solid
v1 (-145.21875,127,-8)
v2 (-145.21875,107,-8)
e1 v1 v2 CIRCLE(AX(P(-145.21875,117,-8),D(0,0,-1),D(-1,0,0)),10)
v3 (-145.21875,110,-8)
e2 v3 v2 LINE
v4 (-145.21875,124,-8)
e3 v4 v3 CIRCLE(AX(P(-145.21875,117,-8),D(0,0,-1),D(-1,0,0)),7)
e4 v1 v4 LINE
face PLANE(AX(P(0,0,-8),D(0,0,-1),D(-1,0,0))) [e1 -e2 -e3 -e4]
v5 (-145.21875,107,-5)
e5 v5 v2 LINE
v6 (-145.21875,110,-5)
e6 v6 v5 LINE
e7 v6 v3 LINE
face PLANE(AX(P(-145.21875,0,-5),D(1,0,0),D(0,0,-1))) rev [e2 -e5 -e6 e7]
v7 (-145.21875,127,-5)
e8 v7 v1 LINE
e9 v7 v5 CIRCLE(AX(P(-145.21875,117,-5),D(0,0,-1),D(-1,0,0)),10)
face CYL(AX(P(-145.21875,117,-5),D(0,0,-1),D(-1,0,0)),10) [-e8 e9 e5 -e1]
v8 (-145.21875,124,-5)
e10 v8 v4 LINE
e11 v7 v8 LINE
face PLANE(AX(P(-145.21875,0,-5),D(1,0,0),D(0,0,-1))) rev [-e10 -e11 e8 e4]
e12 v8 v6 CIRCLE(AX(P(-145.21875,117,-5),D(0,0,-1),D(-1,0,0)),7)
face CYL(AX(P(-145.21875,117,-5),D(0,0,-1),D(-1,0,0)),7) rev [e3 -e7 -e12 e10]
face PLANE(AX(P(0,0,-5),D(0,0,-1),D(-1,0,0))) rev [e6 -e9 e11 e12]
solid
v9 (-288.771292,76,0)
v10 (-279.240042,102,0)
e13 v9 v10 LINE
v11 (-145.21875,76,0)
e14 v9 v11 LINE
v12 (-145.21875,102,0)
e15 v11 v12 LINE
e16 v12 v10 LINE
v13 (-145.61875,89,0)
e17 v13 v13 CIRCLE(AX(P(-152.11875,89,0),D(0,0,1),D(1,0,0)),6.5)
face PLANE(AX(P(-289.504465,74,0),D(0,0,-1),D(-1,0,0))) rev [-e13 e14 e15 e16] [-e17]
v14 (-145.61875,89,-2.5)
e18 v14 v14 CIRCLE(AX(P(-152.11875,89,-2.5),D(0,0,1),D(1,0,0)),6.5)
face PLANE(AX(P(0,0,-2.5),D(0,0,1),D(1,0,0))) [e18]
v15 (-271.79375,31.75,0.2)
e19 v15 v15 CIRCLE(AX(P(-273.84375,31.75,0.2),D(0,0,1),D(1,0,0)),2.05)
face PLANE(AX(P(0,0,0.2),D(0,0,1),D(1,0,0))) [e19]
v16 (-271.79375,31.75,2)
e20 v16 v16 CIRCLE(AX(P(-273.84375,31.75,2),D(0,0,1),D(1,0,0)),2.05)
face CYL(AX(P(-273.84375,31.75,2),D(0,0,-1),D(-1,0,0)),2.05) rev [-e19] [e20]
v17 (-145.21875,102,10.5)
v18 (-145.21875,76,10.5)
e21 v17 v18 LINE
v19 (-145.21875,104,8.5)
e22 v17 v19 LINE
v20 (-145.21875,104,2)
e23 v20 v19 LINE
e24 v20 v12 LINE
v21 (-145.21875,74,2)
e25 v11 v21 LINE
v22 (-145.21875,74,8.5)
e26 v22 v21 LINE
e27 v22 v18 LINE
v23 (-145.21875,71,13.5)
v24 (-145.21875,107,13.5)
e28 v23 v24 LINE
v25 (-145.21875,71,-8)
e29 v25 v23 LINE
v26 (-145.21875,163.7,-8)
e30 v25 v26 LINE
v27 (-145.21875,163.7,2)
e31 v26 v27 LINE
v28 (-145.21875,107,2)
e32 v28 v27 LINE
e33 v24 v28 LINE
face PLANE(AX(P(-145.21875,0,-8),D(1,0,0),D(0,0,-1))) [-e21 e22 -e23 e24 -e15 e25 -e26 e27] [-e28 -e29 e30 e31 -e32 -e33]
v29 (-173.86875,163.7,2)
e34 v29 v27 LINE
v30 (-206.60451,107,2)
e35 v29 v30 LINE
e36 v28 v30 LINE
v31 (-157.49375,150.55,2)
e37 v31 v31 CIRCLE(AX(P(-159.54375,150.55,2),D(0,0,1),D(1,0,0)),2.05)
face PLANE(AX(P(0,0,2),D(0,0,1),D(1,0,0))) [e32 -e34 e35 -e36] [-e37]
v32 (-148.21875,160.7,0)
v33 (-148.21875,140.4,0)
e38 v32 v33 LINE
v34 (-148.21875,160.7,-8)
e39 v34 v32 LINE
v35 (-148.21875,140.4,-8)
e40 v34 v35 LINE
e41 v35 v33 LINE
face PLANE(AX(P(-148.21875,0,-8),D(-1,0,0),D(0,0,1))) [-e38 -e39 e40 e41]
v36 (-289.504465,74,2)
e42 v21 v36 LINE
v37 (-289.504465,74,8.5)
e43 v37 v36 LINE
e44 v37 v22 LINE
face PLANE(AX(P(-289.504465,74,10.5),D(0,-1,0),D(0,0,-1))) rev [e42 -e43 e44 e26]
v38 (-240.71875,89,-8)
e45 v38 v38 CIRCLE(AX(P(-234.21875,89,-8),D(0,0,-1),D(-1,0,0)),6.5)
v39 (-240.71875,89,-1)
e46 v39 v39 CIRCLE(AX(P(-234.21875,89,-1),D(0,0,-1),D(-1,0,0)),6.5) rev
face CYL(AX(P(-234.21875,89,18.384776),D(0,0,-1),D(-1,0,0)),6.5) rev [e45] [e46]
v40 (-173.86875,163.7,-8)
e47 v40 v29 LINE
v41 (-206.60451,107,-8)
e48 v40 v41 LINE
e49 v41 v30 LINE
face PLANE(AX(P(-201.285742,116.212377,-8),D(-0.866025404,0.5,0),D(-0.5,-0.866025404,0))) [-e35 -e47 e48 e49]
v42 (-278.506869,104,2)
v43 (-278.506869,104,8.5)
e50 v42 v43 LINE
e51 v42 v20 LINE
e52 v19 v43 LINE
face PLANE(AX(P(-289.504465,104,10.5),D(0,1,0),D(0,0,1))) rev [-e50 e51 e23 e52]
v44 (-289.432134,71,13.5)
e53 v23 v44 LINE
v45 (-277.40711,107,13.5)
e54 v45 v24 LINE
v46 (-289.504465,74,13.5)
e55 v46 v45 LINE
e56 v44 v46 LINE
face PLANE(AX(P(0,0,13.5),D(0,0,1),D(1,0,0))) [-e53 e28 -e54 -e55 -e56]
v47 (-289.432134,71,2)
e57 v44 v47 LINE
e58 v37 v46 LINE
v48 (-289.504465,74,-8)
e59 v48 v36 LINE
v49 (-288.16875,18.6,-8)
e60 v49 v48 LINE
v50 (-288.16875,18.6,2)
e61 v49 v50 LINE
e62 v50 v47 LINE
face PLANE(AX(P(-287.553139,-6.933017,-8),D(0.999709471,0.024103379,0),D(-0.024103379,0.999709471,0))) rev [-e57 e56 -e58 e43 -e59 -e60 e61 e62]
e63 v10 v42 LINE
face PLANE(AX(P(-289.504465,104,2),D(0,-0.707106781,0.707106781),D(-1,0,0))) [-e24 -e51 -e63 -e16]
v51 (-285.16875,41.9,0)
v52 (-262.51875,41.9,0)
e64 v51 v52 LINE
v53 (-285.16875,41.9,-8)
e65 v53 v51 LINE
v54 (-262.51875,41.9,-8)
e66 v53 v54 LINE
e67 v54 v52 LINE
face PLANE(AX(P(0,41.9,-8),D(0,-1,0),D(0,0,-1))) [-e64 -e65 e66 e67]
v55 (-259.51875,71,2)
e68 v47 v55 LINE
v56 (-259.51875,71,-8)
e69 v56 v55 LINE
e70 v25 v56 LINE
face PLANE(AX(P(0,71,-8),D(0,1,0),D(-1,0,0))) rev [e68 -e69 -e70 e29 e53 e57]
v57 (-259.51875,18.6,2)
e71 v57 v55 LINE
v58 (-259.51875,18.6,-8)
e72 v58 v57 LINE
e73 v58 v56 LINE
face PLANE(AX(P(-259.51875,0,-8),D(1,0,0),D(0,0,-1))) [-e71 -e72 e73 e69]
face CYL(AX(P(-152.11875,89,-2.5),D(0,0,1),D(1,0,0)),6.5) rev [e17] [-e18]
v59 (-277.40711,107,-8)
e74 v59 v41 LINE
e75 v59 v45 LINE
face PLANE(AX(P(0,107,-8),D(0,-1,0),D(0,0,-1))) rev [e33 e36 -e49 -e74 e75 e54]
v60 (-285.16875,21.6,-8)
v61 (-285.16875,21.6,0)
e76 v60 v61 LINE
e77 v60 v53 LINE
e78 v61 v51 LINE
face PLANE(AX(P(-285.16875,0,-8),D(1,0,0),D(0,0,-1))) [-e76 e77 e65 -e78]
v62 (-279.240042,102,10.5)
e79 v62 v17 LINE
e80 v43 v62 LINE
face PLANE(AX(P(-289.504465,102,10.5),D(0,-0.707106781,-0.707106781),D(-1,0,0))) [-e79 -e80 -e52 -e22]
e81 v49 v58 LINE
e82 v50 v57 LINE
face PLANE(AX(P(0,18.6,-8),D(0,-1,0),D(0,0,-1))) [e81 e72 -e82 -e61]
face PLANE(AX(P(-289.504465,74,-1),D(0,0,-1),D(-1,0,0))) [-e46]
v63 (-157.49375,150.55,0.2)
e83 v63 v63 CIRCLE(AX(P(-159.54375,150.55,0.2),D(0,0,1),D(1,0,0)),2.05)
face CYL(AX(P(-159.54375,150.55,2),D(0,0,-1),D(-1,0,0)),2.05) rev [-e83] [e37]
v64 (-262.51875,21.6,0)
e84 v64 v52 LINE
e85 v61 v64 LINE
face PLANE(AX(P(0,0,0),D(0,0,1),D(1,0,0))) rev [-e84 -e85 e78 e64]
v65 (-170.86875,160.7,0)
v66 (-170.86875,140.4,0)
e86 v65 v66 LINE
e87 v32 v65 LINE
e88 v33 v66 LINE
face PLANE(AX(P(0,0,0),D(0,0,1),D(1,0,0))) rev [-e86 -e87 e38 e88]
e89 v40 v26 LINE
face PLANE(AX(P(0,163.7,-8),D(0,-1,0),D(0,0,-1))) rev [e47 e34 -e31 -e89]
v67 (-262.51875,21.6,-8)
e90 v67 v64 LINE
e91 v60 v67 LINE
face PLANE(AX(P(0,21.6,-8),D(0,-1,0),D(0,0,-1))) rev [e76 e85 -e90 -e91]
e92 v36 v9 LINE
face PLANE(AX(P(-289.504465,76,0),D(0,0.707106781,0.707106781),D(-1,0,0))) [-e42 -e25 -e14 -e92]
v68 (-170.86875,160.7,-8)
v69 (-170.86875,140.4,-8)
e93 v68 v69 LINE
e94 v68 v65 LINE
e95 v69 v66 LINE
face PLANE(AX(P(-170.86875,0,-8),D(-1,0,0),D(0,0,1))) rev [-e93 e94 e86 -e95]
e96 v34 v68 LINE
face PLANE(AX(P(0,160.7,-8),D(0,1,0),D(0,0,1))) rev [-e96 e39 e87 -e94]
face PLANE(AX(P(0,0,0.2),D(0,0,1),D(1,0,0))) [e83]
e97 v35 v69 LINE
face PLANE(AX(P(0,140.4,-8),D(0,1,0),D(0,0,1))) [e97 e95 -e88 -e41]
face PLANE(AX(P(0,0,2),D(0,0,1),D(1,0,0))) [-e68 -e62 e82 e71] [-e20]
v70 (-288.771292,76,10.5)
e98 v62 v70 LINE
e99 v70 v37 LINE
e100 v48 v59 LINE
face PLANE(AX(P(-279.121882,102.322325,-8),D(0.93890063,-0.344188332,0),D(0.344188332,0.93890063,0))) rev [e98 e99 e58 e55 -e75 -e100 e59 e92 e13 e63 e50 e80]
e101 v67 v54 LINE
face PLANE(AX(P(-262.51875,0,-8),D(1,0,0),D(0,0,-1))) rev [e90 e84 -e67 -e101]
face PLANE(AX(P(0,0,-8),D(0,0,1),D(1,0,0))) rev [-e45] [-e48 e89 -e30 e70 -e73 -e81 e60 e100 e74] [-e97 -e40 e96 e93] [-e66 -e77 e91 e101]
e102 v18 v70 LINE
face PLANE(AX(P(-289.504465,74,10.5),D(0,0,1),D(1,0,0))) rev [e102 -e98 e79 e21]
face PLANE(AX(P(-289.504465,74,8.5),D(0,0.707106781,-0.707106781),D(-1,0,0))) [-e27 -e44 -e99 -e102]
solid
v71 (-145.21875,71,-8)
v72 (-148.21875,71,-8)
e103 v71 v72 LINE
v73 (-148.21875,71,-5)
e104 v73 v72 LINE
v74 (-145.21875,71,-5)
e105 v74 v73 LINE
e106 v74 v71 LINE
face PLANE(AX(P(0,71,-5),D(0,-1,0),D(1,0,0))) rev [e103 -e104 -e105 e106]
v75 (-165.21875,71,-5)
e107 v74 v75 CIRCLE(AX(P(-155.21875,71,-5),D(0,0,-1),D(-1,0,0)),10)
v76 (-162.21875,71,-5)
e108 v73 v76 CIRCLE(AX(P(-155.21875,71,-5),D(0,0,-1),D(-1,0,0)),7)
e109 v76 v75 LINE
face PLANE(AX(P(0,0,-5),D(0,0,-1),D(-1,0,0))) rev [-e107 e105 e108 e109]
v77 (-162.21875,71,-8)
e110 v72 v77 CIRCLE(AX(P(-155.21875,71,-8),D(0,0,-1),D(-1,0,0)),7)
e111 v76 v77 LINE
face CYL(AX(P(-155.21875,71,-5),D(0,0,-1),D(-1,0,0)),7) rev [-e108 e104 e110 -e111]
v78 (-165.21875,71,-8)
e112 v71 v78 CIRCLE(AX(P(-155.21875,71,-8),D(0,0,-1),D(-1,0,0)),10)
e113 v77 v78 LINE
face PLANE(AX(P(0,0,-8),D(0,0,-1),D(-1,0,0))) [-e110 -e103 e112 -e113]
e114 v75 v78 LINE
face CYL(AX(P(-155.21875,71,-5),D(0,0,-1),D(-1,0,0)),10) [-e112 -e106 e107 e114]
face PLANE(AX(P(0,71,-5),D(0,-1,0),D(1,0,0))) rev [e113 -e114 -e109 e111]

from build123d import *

# Parameters (mm, degrees)
SKETCH3_W             = 22.65000000000009
SKETCH3_H             = 20.30000000000004
SKETCH3_W_2           = 22.64999999999995
BOSS_EXTRUDE1_DEPTH   = 8
SKETCH3_4_R           = 2.049999999999966
SKETCH3_4_R_2         = 2.0499999999999923
BOSS_EXTRUDE2_DEPTH   = 2
BOSS_EXTRUDE3_DEPTH   = 13.5
SKETCH4_W             = 10.499999999999998
SKETCH4_H             = 30.000000000000014
CUT_EXTRUDE1_DEPTH    = 219.62824070668816
CHAMFER1_SIZE         = 2
SKETCH7_R             = 6.500000000000016
CUT_EXTRUDE3_DEPTH    = 2.5
SKETCH8_R             = 6.500000000000016
CUT_EXTRUDE4_DEPTH    = 7
BOSS_EXTRUDE4_DEPTH   = 3
BOSS_EXTRUDE4_2_DEPTH = 3
SKETCH3_9_R           = 2.0499999999999923
SKETCH3_9_R_2         = 2.049999999999966
BOSS_EXTRUDE5_DEPTH   = 0.2


with BuildPart() as part:
    # Sketch3 → Boss-Extrude1 (new body)
    with BuildSketch(Plane.XY):
        Polygon((-289.50446528221903, 74), (-288.1687500000001, 18.600000000000023), (-259.51875, 18.600000000000023), (-259.51875, 71), (-145.21875, 71), (-145.21875, 163.70000000000002), (-173.86874999999995, 163.70000000000002), (-206.60451026305154, 107), (-277.4071095129883, 106.99999999999999), align=None)
        with Locations((-273.84375000000006, 31.750000000000043)):
            Rectangle(SKETCH3_W, SKETCH3_H, mode=Mode.SUBTRACT)
        with Locations((-159.54375, 150.55)):
            Rectangle(SKETCH3_W_2, SKETCH3_H, mode=Mode.SUBTRACT)
    extrude(amount=-BOSS_EXTRUDE1_DEPTH)



with BuildPart() as body_2:
    # Sketch3<4> → Boss-Extrude2 (new body)
    with BuildSketch(Plane.XY):
        Polygon((-289.50446528221903, 74), (-288.1687500000001, 18.600000000000023), (-259.51875, 18.600000000000023), (-259.51875, 71), (-145.21875, 71), (-145.21875, 163.70000000000002), (-173.86874999999995, 163.70000000000002), (-206.60451026305154, 107), (-277.4071095129883, 106.99999999999999), align=None)
        with Locations((-273.84375, 31.749999999999986)):
            Circle(SKETCH3_4_R, mode=Mode.SUBTRACT)
        with Locations((-159.54375, 150.55)):
            Circle(SKETCH3_4_R_2, mode=Mode.SUBTRACT)
    extrude(amount=BOSS_EXTRUDE2_DEPTH)


with BuildPart() as part_1:
    add(part.part)

    add(body_2.part)  # Boss-Extrude3 merges body 2
    # Sketch3<8> → Boss-Extrude3 (add)
    with BuildSketch(Plane.XY):
        Polygon((-288.1687500000001, 77.64365611411853), (-288.1687500000001, 70.99999999999999), (-259.51875, 71), (-145.21875, 71), (-145.21875, 107), (-206.60451026305154, 107), (-277.4071095129883, 106.99999999999999), align=None)
        Polygon((-289.4321341297523, 70.99999999999999), (-288.1687500000001, 70.99999999999999), (-288.1687500000001, 77.64365611411853), (-289.50446528221903, 74), align=None)
    extrude(amount=BOSS_EXTRUDE3_DEPTH)

    # Sketch4 → Cut-Extrude1 (cut, through all)
    with BuildSketch(Plane(origin=(-145.21875, 0, 0), x_dir=(0, 0, -1), z_dir=(1, 0, 0))):
        with Locations((-5.249999999999999, 89)):
            Rectangle(SKETCH4_W, SKETCH4_H)
    extrude(amount=-CUT_EXTRUDE1_DEPTH, mode=Mode.SUBTRACT)

    # Chamfer1
    chamfer1_edges = [part_1.edges().sort_by_distance(p)[0] for p in [
        (-217.36160764110952, 74, 10.499999999999998),
        (-211.86280956418642, 104, 10.499999999999998),
        (-211.86280956418642, 104, 0),
        (-217.36160764110952, 74, 0),
    ]]
    chamfer(chamfer1_edges, length=CHAMFER1_SIZE)

    # Sketch7 → Cut-Extrude3 (cut)
    with BuildSketch(Plane.XY):
        with Locations((-152.11875000000003, 88.99999999999999)):
            Circle(SKETCH7_R)
    extrude(amount=-CUT_EXTRUDE3_DEPTH, mode=Mode.SUBTRACT)

    # Sketch8 → Cut-Extrude4 (cut)
    with BuildSketch(Plane(origin=(0, 0, -8), x_dir=(-1, 0, 0), z_dir=(0, 0, -1))):
        with Locations((234.21875, 89)):
            Circle(SKETCH8_R)
    extrude(amount=-CUT_EXTRUDE4_DEPTH, mode=Mode.SUBTRACT)

    # Sketch3<9> → Boss-Extrude5 (add)
    with BuildSketch(Plane.XY):
        with Locations((-159.54375, 150.55)):
            Circle(SKETCH3_9_R)
        with Locations((-273.84375, 31.749999999999986)):
            Circle(SKETCH3_9_R_2)
    extrude(amount=BOSS_EXTRUDE5_DEPTH)


with BuildPart() as body_2_2:
    # Sketch9 → Boss-Extrude4 (new body)
    with BuildSketch(Plane(origin=(0, 0, -8), x_dir=(-1, 0, 0), z_dir=(0, 0, -1))):
        with BuildLine():
            ThreePointArc((145.21875000000003, 71), (155.21875000000003, 60.999999999999986), (165.21875000000003, 71))
            Line((165.21875000000003, 71), (162.21875000000003, 71))
            ThreePointArc((162.21875000000006, 71), (155.21875000000003, 63.999999999999986), (148.21875, 71))
            Line((148.21875, 71), (145.21875, 71))
        make_face()
    extrude(amount=-BOSS_EXTRUDE4_DEPTH)


with BuildPart() as body_3:
    # Sketch9 → Boss-Extrude4 2 (new body)
    with BuildSketch(Plane(origin=(0, 0, -8), x_dir=(-1, 0, 0), z_dir=(0, 0, -1))):
        with BuildLine():
            Line((145.21875, 124.00000000000001), (145.21875, 127))
            ThreePointArc((145.21875, 127.00000000000001), (135.21875, 117), (145.21875, 106.99999999999999))
            Line((145.21875, 107), (145.21875, 109.99999999999997))
            ThreePointArc((145.21875, 109.99999999999999), (138.21874999999997, 117), (145.21875, 124.00000000000001))
        make_face()
    extrude(amount=-BOSS_EXTRUDE4_2_DEPTH)


solid = Compound([part_1.part, body_2_2.part, body_3.part])
